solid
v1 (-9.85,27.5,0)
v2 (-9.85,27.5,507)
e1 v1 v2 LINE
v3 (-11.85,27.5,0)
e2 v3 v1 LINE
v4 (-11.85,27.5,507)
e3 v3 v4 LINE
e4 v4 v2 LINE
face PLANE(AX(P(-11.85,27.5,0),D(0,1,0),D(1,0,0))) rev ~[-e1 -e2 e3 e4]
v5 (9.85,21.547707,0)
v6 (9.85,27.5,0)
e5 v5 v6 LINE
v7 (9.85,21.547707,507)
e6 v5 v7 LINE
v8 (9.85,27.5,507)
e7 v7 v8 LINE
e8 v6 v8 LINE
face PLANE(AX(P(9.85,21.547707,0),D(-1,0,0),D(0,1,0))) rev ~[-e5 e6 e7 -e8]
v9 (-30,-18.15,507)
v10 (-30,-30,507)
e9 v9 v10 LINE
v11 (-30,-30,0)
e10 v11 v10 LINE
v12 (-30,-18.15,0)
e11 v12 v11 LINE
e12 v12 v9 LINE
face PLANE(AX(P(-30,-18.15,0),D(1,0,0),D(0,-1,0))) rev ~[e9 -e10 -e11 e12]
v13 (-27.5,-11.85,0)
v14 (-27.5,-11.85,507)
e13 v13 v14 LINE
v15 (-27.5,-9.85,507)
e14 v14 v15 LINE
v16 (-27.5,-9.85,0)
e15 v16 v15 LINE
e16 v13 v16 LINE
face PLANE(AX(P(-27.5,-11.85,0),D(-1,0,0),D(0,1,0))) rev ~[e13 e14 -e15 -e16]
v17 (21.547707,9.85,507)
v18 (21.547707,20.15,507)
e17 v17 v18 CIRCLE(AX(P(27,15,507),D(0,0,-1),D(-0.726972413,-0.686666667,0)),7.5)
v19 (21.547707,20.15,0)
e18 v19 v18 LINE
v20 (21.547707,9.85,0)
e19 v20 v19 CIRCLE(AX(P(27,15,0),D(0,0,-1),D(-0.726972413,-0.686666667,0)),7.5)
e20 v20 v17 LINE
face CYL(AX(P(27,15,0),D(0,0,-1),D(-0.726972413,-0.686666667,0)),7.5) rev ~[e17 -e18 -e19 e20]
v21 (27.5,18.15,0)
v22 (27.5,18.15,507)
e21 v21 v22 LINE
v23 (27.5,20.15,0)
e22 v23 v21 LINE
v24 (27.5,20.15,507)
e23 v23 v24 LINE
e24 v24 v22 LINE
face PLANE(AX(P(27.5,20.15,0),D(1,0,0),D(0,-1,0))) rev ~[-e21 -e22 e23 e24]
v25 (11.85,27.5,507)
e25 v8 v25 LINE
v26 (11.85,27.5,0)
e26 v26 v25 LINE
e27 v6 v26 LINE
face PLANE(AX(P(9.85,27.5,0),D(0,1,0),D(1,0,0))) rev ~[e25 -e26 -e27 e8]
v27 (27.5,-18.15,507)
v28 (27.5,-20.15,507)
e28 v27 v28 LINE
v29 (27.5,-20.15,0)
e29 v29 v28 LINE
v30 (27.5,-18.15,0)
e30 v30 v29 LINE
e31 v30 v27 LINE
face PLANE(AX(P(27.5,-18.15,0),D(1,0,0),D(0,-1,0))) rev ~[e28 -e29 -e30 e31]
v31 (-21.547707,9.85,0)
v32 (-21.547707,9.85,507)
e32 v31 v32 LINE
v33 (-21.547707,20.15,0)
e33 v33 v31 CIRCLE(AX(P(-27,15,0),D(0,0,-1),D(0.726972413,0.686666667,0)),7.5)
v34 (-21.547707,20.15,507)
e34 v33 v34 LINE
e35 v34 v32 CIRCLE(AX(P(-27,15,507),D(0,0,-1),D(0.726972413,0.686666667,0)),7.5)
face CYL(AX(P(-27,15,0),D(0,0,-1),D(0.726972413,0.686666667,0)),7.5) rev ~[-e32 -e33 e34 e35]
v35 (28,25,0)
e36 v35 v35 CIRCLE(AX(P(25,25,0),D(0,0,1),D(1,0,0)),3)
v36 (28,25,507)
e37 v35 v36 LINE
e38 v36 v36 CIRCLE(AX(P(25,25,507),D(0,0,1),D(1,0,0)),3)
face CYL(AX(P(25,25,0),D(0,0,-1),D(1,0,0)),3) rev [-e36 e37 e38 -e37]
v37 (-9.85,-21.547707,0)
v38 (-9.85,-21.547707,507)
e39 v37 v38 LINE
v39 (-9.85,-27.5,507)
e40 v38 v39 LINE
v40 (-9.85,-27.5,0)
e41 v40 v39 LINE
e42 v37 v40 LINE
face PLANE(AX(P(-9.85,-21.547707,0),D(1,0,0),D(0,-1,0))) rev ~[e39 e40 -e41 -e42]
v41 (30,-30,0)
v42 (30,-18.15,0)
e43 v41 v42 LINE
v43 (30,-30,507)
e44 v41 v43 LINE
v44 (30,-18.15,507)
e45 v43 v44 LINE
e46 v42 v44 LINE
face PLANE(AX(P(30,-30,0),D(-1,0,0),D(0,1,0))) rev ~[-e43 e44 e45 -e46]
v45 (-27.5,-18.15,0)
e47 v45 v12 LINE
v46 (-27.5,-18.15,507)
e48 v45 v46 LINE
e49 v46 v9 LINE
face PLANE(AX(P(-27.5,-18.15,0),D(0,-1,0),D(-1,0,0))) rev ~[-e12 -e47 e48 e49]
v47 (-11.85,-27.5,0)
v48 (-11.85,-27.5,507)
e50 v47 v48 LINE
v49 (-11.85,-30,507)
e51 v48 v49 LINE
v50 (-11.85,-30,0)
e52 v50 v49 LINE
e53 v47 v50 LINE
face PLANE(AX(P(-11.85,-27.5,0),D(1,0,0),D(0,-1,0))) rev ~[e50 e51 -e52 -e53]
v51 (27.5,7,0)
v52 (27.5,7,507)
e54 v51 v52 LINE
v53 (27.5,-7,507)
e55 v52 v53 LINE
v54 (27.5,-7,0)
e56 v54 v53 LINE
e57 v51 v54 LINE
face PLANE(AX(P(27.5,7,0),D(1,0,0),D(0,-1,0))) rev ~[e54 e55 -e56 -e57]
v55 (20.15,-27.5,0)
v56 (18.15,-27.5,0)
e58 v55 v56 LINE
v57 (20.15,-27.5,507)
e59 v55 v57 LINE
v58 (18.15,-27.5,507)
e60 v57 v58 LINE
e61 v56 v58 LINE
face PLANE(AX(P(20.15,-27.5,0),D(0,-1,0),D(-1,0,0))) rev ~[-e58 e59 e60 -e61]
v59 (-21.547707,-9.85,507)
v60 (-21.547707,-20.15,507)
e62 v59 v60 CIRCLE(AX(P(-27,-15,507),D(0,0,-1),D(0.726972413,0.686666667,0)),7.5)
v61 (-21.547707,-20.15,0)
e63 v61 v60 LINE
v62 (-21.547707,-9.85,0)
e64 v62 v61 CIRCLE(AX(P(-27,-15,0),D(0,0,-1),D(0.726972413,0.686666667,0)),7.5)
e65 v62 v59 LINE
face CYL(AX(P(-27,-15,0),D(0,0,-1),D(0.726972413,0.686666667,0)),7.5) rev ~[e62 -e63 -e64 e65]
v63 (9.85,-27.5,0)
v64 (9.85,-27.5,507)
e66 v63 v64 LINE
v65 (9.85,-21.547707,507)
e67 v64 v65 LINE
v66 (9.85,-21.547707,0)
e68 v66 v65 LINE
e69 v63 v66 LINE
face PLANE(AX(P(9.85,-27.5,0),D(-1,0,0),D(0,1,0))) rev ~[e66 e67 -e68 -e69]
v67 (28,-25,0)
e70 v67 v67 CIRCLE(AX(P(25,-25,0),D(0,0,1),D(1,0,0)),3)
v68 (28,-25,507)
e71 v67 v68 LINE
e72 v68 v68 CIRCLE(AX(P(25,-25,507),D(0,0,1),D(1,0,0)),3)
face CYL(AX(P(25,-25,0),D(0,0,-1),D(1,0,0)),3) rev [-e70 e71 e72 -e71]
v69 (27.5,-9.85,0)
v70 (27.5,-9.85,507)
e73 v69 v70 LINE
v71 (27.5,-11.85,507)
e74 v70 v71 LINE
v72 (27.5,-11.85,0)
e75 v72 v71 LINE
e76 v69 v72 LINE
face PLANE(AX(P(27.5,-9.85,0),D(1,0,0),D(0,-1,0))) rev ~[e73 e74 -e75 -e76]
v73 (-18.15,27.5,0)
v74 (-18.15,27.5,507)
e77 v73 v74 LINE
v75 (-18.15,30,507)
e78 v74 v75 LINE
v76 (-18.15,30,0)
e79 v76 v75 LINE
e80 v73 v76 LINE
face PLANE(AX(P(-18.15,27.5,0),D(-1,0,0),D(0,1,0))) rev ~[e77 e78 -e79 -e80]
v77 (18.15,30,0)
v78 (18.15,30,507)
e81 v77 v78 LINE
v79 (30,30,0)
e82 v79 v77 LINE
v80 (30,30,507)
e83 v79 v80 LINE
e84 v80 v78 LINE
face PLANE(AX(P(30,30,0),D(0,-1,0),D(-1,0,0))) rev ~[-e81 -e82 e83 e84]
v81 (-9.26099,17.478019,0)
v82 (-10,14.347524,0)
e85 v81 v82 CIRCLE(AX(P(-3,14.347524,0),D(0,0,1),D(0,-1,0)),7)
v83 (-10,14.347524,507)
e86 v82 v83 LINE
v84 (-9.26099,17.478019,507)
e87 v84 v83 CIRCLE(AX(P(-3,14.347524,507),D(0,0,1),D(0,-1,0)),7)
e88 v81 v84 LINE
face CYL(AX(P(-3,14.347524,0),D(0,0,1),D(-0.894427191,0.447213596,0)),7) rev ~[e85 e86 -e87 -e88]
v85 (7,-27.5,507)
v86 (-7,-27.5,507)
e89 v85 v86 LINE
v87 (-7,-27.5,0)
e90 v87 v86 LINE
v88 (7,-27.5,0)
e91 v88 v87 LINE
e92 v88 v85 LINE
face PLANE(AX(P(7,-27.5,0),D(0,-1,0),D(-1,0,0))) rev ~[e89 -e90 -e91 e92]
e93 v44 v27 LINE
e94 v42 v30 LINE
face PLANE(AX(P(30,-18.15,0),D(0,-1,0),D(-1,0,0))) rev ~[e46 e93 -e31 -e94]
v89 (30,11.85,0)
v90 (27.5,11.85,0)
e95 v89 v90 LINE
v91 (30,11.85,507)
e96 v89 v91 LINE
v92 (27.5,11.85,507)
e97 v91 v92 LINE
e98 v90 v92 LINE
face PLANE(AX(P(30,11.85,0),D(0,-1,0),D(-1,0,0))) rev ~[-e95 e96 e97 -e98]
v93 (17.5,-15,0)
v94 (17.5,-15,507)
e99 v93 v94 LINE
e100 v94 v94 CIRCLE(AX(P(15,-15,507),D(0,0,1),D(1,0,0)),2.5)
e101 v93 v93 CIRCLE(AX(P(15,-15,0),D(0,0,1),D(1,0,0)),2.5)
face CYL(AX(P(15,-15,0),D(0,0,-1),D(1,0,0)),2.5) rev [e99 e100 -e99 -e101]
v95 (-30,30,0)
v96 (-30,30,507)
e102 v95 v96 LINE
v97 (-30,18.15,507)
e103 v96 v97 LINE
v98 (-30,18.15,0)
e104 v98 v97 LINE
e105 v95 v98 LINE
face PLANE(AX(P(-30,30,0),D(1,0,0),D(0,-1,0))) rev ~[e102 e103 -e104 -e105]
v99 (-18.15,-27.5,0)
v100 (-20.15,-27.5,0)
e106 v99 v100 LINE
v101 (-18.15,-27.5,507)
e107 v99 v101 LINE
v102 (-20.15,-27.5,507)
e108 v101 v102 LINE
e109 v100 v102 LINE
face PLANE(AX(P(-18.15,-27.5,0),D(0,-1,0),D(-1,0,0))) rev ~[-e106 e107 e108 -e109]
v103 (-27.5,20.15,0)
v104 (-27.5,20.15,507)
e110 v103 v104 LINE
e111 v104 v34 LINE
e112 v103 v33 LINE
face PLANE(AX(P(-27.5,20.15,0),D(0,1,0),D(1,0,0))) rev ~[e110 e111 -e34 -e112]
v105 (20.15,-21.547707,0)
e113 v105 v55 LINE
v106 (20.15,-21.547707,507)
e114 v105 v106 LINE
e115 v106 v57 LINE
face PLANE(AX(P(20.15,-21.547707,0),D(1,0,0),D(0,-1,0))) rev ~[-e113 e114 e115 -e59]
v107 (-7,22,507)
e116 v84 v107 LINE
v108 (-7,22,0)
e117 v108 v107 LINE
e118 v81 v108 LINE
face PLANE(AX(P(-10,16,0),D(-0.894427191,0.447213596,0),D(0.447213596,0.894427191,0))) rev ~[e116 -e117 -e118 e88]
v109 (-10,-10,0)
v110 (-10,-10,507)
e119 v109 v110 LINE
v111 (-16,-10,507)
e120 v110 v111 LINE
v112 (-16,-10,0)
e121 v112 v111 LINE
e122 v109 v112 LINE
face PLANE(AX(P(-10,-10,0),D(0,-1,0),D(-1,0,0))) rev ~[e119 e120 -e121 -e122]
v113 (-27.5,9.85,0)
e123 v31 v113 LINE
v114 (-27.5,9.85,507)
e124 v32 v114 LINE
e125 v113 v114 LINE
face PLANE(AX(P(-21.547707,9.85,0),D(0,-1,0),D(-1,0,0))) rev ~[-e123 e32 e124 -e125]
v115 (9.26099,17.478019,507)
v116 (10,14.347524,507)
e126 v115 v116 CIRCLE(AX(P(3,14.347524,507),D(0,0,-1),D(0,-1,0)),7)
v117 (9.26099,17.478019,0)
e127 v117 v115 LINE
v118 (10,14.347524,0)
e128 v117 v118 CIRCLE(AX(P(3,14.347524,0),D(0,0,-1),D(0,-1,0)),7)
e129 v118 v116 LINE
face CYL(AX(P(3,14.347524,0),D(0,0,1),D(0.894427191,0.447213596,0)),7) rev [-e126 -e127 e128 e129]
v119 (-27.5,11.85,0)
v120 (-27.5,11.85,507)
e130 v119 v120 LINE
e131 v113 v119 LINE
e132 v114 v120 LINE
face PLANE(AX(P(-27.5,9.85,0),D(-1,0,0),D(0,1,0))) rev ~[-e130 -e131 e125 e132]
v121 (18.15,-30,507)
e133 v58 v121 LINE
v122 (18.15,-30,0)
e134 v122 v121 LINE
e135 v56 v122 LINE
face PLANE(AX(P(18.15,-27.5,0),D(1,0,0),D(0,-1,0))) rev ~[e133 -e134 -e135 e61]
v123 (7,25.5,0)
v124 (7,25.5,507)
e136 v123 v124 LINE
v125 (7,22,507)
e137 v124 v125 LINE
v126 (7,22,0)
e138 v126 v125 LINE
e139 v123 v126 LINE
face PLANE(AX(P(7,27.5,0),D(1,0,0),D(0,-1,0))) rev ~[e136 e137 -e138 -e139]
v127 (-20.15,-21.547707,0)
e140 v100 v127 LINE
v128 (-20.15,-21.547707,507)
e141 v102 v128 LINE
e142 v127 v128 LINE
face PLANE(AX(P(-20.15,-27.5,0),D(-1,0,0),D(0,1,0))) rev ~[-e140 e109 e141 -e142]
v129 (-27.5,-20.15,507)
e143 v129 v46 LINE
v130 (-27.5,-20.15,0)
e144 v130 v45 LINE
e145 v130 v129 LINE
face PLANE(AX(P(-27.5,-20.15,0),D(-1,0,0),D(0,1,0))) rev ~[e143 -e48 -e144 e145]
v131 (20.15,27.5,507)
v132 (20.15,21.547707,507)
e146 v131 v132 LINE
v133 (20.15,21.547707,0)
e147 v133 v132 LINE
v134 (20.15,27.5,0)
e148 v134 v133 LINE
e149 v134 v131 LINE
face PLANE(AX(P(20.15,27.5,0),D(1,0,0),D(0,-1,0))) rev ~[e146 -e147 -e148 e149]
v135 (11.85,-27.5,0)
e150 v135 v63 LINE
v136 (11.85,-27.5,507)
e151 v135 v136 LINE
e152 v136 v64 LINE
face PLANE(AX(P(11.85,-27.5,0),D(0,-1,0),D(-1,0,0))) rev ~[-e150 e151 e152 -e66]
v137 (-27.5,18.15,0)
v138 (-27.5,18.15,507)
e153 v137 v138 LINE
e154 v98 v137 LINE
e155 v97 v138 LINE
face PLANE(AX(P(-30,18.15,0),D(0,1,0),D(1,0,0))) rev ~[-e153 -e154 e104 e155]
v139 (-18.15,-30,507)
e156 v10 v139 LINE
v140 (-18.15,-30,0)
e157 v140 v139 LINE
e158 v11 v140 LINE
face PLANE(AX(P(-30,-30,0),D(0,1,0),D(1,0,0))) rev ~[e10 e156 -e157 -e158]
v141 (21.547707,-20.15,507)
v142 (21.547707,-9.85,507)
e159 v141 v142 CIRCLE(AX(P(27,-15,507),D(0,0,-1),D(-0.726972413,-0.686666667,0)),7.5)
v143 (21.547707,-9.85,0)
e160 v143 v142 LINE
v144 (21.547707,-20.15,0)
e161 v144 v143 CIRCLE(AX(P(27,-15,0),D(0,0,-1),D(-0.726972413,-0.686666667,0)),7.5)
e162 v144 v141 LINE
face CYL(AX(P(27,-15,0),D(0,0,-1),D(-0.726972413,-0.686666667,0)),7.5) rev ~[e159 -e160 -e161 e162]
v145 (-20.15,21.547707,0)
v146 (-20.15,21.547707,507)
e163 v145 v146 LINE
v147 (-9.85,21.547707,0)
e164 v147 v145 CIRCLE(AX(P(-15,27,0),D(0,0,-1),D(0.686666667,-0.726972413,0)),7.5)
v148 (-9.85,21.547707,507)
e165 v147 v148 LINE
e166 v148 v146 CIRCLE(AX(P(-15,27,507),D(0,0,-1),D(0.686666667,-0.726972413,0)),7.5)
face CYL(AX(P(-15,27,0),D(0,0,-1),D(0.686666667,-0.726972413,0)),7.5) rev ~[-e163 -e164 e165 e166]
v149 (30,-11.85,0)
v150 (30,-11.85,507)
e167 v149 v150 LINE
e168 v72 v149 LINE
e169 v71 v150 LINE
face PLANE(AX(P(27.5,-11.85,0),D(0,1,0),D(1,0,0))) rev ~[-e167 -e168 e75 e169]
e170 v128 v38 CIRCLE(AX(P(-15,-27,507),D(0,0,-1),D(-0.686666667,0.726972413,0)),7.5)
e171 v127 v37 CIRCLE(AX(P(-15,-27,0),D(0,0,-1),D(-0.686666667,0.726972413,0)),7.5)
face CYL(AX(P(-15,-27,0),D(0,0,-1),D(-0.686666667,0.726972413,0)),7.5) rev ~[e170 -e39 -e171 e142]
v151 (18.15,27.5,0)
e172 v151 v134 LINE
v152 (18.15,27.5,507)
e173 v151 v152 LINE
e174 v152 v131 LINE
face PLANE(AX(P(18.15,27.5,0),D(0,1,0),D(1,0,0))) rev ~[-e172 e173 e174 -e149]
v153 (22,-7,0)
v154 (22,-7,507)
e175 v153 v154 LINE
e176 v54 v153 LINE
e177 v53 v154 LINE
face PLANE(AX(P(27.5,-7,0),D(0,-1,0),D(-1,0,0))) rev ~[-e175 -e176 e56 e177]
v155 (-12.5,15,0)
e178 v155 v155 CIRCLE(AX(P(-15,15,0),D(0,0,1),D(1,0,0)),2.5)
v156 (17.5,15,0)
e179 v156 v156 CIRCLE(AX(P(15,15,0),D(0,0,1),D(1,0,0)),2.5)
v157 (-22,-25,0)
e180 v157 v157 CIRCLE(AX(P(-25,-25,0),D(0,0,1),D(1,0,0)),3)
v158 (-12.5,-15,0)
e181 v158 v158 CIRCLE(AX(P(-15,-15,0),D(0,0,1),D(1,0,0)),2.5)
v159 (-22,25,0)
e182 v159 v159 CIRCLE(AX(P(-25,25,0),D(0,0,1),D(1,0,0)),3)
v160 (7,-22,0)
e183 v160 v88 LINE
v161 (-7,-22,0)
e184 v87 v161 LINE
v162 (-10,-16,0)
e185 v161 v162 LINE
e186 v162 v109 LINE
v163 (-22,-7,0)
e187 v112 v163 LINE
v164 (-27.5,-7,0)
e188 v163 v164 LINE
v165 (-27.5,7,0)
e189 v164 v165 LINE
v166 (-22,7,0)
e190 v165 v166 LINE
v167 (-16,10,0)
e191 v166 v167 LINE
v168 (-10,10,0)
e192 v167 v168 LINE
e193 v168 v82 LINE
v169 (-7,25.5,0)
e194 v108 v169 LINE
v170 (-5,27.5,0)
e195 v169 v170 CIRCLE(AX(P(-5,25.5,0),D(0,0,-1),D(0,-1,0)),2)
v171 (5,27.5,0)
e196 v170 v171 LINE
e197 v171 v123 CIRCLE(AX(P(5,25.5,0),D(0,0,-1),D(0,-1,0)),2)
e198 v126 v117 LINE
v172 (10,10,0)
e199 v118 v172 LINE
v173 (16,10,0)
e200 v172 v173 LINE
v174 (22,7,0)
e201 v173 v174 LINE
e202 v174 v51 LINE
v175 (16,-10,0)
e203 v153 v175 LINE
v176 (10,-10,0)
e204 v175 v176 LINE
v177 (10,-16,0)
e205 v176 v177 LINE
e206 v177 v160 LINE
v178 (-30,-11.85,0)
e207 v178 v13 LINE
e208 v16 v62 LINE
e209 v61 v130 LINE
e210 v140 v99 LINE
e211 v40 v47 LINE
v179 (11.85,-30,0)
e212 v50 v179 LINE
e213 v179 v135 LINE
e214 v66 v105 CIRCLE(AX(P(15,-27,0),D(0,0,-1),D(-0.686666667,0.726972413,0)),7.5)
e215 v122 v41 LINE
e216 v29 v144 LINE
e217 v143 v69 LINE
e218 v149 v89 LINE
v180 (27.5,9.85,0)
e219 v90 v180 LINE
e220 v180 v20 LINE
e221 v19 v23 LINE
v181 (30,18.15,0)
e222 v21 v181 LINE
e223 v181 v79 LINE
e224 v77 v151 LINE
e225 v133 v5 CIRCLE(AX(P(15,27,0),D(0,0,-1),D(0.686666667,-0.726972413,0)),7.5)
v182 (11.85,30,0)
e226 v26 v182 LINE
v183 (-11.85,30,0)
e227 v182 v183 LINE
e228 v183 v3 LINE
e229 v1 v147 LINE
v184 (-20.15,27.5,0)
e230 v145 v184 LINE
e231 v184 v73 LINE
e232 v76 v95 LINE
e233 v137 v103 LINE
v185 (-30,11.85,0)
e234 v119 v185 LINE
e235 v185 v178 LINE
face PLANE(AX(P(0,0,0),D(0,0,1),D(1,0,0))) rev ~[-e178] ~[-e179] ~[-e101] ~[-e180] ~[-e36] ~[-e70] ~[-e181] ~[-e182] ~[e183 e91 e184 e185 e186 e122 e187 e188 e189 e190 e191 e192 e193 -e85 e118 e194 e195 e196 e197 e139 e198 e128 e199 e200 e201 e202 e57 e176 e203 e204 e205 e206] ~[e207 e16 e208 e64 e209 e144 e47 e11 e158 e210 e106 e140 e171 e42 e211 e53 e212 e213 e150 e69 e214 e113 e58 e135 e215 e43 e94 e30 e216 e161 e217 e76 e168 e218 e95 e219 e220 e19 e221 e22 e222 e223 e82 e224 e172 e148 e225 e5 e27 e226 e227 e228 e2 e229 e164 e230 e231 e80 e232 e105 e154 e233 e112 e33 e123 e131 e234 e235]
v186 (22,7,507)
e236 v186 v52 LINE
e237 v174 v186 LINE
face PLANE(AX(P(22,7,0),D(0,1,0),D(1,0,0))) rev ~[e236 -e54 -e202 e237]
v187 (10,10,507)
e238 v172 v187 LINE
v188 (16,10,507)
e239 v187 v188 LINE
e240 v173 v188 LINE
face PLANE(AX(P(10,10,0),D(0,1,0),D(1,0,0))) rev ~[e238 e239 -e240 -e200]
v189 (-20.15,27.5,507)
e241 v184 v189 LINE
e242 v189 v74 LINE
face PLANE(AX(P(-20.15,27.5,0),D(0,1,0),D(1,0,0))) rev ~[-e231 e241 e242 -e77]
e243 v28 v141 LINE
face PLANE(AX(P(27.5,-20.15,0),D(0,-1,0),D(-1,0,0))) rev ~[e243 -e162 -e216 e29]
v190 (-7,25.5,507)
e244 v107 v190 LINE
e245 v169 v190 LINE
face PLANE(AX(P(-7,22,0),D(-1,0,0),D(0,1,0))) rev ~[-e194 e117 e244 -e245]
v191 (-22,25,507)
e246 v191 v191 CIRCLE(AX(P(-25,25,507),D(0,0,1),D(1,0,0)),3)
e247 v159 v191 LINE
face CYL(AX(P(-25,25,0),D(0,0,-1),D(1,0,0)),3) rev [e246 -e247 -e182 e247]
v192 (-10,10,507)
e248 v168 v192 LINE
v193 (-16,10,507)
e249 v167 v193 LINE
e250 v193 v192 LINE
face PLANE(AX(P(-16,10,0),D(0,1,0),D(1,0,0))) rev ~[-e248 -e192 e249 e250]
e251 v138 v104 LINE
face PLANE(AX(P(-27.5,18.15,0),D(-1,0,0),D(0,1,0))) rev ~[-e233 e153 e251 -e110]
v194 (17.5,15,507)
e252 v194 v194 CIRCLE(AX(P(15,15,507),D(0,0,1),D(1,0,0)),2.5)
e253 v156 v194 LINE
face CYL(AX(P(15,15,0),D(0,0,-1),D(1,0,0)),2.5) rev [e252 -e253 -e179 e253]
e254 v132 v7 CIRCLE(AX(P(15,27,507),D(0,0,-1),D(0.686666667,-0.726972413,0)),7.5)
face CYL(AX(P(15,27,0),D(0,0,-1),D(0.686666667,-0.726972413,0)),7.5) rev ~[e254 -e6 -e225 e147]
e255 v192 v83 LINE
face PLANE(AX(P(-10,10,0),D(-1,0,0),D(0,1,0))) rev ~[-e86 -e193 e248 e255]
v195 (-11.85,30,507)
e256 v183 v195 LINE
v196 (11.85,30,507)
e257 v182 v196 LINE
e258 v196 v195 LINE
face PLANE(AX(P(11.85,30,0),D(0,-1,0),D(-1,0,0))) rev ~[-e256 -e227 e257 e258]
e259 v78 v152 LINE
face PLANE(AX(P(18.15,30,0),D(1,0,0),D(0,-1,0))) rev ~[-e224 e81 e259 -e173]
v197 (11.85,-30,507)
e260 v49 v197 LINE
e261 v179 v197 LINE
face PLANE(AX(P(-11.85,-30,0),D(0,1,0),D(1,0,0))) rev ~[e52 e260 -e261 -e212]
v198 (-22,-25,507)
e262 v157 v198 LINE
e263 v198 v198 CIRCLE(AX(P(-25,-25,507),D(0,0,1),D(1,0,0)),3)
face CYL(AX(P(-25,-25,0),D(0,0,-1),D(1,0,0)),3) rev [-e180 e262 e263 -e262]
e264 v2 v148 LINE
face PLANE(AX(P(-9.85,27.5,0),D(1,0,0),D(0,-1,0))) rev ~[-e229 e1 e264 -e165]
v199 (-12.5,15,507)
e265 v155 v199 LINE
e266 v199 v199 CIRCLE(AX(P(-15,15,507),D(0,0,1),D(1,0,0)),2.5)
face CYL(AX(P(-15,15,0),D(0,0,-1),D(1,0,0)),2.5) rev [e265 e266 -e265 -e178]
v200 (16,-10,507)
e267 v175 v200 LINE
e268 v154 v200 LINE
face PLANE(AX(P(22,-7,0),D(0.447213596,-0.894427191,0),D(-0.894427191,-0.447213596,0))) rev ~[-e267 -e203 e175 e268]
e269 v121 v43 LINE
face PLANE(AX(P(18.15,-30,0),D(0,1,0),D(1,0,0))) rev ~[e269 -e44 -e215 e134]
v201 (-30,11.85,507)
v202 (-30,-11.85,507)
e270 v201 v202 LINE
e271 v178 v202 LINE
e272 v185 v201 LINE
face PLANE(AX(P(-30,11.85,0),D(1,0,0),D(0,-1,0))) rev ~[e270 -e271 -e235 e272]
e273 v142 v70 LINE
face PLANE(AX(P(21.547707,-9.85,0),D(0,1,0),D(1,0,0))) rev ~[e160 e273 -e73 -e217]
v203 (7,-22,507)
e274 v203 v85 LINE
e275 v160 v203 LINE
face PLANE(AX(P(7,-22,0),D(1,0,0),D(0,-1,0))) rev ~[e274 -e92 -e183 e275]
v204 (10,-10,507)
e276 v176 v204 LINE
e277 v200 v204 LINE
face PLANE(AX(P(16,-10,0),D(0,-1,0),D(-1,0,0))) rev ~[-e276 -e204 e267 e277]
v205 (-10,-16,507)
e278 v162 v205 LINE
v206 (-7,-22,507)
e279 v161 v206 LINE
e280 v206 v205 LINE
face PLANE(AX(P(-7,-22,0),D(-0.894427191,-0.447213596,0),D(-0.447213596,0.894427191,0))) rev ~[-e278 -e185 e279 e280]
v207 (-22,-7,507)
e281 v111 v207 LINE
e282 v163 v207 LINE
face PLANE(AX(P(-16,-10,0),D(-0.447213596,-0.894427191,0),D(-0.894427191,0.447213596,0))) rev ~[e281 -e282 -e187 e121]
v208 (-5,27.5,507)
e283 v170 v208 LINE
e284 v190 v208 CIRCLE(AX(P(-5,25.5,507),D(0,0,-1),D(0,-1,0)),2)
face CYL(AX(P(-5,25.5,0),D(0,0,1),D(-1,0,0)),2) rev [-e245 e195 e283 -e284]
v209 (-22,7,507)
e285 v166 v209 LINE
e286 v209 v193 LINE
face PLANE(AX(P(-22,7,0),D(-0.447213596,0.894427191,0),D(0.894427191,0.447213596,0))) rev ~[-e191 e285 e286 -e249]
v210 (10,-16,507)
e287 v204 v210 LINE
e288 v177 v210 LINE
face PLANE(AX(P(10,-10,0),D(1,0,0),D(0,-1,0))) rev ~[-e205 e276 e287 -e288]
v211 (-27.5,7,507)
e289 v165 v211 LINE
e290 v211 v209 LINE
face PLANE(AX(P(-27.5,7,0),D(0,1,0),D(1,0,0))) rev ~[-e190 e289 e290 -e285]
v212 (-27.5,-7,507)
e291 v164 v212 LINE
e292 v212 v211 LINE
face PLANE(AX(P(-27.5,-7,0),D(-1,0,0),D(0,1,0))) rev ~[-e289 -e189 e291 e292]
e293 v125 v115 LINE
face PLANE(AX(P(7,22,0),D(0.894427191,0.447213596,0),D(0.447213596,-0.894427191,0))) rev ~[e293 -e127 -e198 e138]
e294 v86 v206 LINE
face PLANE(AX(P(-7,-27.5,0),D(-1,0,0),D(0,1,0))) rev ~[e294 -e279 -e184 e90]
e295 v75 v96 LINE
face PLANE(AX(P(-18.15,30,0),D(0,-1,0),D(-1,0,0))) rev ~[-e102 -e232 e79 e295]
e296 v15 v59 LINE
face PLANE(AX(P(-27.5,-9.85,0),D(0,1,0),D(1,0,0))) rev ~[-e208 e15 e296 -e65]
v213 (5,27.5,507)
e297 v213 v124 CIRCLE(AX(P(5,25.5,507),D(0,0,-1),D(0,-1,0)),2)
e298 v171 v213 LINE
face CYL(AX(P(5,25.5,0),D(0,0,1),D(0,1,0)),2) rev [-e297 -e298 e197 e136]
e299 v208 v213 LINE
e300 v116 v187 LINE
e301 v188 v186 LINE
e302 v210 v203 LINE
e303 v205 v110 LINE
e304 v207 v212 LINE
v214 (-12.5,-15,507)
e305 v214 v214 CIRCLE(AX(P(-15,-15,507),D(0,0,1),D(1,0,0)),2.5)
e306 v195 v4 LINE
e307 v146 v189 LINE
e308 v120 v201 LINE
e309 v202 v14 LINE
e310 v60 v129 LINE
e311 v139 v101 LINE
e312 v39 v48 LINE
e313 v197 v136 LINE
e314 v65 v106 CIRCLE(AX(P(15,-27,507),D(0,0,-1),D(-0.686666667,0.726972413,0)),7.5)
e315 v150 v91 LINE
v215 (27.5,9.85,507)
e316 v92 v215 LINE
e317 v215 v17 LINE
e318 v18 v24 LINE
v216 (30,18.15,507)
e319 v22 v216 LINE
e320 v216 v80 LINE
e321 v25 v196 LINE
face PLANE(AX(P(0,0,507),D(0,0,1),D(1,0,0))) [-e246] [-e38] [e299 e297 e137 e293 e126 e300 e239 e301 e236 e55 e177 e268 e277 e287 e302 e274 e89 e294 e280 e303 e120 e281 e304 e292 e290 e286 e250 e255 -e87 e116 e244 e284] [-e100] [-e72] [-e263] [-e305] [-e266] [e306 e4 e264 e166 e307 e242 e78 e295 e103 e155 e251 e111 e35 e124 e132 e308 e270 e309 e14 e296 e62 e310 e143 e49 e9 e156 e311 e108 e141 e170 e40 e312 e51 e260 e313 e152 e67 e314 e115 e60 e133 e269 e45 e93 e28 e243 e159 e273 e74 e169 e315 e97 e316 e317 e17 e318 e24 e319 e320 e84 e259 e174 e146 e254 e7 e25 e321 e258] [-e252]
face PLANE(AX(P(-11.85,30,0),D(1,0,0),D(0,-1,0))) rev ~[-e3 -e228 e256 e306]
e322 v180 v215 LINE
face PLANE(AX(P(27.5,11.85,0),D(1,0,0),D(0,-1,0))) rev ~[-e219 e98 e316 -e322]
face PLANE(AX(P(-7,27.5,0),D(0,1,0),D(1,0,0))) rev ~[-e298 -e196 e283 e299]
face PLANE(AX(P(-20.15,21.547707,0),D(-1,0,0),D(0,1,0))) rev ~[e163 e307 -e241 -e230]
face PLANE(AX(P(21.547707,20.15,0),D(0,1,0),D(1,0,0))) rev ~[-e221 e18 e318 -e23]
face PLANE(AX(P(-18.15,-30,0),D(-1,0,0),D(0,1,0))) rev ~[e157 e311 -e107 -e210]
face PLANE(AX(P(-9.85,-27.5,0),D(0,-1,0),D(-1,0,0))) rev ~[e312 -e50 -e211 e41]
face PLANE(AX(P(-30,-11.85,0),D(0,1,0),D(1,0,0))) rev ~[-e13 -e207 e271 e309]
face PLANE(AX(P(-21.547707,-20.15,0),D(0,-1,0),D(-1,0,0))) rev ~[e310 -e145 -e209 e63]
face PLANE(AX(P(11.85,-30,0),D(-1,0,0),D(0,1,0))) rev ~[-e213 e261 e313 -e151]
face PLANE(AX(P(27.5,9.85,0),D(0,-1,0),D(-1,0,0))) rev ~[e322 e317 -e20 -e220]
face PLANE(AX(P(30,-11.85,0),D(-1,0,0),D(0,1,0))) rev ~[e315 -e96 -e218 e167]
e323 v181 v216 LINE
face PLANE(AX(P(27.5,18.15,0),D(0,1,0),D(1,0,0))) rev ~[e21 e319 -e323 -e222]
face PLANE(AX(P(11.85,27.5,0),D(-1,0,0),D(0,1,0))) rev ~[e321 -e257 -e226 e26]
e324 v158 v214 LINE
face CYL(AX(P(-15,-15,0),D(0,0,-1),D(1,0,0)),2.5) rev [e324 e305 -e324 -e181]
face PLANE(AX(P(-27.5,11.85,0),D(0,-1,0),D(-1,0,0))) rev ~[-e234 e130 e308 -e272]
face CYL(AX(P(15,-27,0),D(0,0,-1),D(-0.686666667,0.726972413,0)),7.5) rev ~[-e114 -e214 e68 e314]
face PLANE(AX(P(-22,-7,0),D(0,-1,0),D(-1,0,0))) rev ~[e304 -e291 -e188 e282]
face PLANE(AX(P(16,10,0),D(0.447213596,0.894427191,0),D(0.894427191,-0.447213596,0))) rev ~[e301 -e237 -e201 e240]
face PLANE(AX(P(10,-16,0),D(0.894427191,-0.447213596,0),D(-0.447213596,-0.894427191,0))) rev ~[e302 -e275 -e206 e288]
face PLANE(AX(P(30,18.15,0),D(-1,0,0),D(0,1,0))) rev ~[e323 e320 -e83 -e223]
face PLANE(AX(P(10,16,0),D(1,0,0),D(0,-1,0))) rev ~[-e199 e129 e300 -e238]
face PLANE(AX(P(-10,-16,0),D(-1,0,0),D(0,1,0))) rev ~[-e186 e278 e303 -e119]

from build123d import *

# Parameters (mm, degrees)
F0_R     = 3
F0_R_2   = 2.5
F1_DEPTH = 507
F2_R     = 2
F3_R     = 7


# Not quite as in the source:
# - a feature names something its author has since deleted; it is built from what else it names


with BuildPart() as f1:
    # F0 (on Top) → F1 (new body)
    with BuildSketch(Plane.XY):
        with BuildLine():
            Line((18.15, -30), (30, -30))
            Line((30, -30), (30, -18.15))
            Line((30, -18.15), (27.5, -18.15))
            Line((27.5, -18.15), (27.5, -20.15))
            Line((27.5, -20.15), (21.5477069044, -20.15))
            ThreePointArc((21.5477069044, -20.15), (19.5, -15), (21.5477069044, -9.85))
            Line((21.5477069044, -9.85), (27.5, -9.85))
            Line((27.5, -9.85), (27.5, -11.85))
            Line((27.5, -11.85), (30, -11.85))
            Line((30, -11.85), (30, 11.85))
            Line((30, 11.85), (27.5, 11.85))
            Line((27.5, 11.85), (27.5, 9.85))
            Line((27.5, 9.85), (21.5477069044, 9.85))
            ThreePointArc((21.5477069044, 9.85), (19.5, 15), (21.5477069044, 20.15))
            Line((21.5477069044, 20.15), (27.5, 20.15))
            Line((27.5, 20.15), (27.5, 18.15))
            Line((27.5, 18.15), (30, 18.15))
            Line((30, 18.15), (30, 30))
            Line((30, 30), (18.15, 30))
            Line((18.15, 30), (18.15, 27.5))
            Line((18.15, 27.5), (20.15, 27.5))
            Line((20.15, 27.5), (20.15, 21.5477069044))
            ThreePointArc((20.15, 21.5477069044), (15, 19.5), (9.85, 21.5477069044))
            Line((9.85, 21.5477069044), (9.85, 27.5))
            Line((9.85, 27.5), (11.85, 27.5))
            Line((11.85, 27.5), (11.85, 30))
            Line((11.85, 30), (-11.85, 30))
            Line((-11.85, 30), (-11.85, 27.5))
            Line((-11.85, 27.5), (-9.85, 27.5))
            Line((-9.85, 27.5), (-9.85, 21.5477069044))
            ThreePointArc((-9.85, 21.5477069044), (-15, 19.5), (-20.15, 21.5477069044))
            Line((-20.15, 21.5477069044), (-20.15, 27.5))
            Line((-20.15, 27.5), (-18.15, 27.5))
            Line((-18.15, 27.5), (-18.15, 30))
            Line((-18.15, 30), (-30, 30))
            Line((-30, 30), (-30, 18.15))
            Line((-30, 18.15), (-27.5, 18.15))
            Line((-27.5, 18.15), (-27.5, 20.15))
            Line((-27.5, 20.15), (-21.5477069044, 20.15))
            ThreePointArc((-21.5477069044, 20.15), (-19.5, 15), (-21.5477069044, 9.85))
            Line((-21.5477069044, 9.85), (-27.5, 9.85))
            Line((-27.5, 9.85), (-27.5, 11.85))
            Line((-27.5, 11.85), (-30, 11.85))
            Line((-30, 11.85), (-30, -11.85))
            Line((-30, -11.85), (-27.5, -11.85))
            Line((-27.5, -11.85), (-27.5, -9.85))
            Line((-27.5, -9.85), (-21.5477069044, -9.85))
            ThreePointArc((-21.5477069044, -9.85), (-19.5, -15), (-21.5477069044, -20.15))
            Line((-21.5477069044, -20.15), (-27.5, -20.15))
            Line((-27.5, -20.15), (-27.5, -18.15))
            Line((-27.5, -18.15), (-30, -18.15))
            Line((-30, -18.15), (-30, -30))
            Line((-30, -30), (-18.15, -30))
            Line((-18.15, -30), (-18.15, -27.5))
            Line((-18.15, -27.5), (-20.15, -27.5))
            Line((-20.15, -27.5), (-20.15, -21.5477069044))
            ThreePointArc((-20.15, -21.5477069044), (-15, -19.5), (-9.85, -21.5477069044))
            Line((-9.85, -21.5477069044), (-9.85, -27.5))
            Line((-9.85, -27.5), (-11.85, -27.5))
            Line((-11.85, -27.5), (-11.85, -30))
            Line((-11.85, -30), (11.85, -30))
            Line((11.85, -30), (11.85, -27.5))
            Line((11.85, -27.5), (9.85, -27.5))
            Line((9.85, -27.5), (9.85, -21.5477069044))
            ThreePointArc((9.85, -21.5477069044), (15, -19.5), (20.15, -21.5477069044))
            Line((20.15, -21.5477069044), (20.15, -27.5))
            Line((20.15, -27.5), (18.15, -27.5))
            Line((18.15, -27.5), (18.15, -30))
        make_face()
        with Locations((-25, -25)):
            Circle(F0_R, mode=Mode.SUBTRACT)
        with Locations((-15, -15)):
            Circle(F0_R_2, mode=Mode.SUBTRACT)
        with Locations((25, -25)):
            Circle(F0_R, mode=Mode.SUBTRACT)
        with Locations((15, -15)):
            Circle(F0_R_2, mode=Mode.SUBTRACT)
        with Locations((-25, 25)):
            Circle(F0_R, mode=Mode.SUBTRACT)
        with Locations((-15, 15)):
            Circle(F0_R_2, mode=Mode.SUBTRACT)
        Polygon((-7, 22), (-7, 27.5), (0, 27.5), (7, 27.5), (7, 22), (10, 16), (10, 10), (16, 10), (22, 7), (27.5, 7), (27.5, 0), (27.5, -7), (22, -7), (16, -10), (10, -10), (10, -16), (7, -22), (7, -27.5), (0, -27.5), (-7, -27.5), (-7, -22), (-10, -16), (-10, -10), (-16, -10), (-22, -7), (-27.5, -7), (-27.5, 0), (-27.5, 7), (-22, 7), (-16, 10), (-10, 10), (-10, 16), align=None, mode=Mode.SUBTRACT)
        with Locations((15, 15)):
            Circle(F0_R_2, mode=Mode.SUBTRACT)
        with Locations((25, 25)):
            Circle(F0_R, mode=Mode.SUBTRACT)
    extrude(amount=F1_DEPTH)

    # F2
    f2_edges = [f1.edges().sort_by_distance(p)[0] for p in [
        (-7, 27.5, 253.5),
        (7, 27.5, 253.5),
    ]]
    fillet(f2_edges, radius=F2_R)

    # F3
    f3_edges = [f1.edges().sort_by_distance(p)[0] for p in [
        (-10, 16, 253.5),
        (10, 16, 253.5),
    ]]
    fillet(f3_edges, radius=F3_R)


solid = f1.part
